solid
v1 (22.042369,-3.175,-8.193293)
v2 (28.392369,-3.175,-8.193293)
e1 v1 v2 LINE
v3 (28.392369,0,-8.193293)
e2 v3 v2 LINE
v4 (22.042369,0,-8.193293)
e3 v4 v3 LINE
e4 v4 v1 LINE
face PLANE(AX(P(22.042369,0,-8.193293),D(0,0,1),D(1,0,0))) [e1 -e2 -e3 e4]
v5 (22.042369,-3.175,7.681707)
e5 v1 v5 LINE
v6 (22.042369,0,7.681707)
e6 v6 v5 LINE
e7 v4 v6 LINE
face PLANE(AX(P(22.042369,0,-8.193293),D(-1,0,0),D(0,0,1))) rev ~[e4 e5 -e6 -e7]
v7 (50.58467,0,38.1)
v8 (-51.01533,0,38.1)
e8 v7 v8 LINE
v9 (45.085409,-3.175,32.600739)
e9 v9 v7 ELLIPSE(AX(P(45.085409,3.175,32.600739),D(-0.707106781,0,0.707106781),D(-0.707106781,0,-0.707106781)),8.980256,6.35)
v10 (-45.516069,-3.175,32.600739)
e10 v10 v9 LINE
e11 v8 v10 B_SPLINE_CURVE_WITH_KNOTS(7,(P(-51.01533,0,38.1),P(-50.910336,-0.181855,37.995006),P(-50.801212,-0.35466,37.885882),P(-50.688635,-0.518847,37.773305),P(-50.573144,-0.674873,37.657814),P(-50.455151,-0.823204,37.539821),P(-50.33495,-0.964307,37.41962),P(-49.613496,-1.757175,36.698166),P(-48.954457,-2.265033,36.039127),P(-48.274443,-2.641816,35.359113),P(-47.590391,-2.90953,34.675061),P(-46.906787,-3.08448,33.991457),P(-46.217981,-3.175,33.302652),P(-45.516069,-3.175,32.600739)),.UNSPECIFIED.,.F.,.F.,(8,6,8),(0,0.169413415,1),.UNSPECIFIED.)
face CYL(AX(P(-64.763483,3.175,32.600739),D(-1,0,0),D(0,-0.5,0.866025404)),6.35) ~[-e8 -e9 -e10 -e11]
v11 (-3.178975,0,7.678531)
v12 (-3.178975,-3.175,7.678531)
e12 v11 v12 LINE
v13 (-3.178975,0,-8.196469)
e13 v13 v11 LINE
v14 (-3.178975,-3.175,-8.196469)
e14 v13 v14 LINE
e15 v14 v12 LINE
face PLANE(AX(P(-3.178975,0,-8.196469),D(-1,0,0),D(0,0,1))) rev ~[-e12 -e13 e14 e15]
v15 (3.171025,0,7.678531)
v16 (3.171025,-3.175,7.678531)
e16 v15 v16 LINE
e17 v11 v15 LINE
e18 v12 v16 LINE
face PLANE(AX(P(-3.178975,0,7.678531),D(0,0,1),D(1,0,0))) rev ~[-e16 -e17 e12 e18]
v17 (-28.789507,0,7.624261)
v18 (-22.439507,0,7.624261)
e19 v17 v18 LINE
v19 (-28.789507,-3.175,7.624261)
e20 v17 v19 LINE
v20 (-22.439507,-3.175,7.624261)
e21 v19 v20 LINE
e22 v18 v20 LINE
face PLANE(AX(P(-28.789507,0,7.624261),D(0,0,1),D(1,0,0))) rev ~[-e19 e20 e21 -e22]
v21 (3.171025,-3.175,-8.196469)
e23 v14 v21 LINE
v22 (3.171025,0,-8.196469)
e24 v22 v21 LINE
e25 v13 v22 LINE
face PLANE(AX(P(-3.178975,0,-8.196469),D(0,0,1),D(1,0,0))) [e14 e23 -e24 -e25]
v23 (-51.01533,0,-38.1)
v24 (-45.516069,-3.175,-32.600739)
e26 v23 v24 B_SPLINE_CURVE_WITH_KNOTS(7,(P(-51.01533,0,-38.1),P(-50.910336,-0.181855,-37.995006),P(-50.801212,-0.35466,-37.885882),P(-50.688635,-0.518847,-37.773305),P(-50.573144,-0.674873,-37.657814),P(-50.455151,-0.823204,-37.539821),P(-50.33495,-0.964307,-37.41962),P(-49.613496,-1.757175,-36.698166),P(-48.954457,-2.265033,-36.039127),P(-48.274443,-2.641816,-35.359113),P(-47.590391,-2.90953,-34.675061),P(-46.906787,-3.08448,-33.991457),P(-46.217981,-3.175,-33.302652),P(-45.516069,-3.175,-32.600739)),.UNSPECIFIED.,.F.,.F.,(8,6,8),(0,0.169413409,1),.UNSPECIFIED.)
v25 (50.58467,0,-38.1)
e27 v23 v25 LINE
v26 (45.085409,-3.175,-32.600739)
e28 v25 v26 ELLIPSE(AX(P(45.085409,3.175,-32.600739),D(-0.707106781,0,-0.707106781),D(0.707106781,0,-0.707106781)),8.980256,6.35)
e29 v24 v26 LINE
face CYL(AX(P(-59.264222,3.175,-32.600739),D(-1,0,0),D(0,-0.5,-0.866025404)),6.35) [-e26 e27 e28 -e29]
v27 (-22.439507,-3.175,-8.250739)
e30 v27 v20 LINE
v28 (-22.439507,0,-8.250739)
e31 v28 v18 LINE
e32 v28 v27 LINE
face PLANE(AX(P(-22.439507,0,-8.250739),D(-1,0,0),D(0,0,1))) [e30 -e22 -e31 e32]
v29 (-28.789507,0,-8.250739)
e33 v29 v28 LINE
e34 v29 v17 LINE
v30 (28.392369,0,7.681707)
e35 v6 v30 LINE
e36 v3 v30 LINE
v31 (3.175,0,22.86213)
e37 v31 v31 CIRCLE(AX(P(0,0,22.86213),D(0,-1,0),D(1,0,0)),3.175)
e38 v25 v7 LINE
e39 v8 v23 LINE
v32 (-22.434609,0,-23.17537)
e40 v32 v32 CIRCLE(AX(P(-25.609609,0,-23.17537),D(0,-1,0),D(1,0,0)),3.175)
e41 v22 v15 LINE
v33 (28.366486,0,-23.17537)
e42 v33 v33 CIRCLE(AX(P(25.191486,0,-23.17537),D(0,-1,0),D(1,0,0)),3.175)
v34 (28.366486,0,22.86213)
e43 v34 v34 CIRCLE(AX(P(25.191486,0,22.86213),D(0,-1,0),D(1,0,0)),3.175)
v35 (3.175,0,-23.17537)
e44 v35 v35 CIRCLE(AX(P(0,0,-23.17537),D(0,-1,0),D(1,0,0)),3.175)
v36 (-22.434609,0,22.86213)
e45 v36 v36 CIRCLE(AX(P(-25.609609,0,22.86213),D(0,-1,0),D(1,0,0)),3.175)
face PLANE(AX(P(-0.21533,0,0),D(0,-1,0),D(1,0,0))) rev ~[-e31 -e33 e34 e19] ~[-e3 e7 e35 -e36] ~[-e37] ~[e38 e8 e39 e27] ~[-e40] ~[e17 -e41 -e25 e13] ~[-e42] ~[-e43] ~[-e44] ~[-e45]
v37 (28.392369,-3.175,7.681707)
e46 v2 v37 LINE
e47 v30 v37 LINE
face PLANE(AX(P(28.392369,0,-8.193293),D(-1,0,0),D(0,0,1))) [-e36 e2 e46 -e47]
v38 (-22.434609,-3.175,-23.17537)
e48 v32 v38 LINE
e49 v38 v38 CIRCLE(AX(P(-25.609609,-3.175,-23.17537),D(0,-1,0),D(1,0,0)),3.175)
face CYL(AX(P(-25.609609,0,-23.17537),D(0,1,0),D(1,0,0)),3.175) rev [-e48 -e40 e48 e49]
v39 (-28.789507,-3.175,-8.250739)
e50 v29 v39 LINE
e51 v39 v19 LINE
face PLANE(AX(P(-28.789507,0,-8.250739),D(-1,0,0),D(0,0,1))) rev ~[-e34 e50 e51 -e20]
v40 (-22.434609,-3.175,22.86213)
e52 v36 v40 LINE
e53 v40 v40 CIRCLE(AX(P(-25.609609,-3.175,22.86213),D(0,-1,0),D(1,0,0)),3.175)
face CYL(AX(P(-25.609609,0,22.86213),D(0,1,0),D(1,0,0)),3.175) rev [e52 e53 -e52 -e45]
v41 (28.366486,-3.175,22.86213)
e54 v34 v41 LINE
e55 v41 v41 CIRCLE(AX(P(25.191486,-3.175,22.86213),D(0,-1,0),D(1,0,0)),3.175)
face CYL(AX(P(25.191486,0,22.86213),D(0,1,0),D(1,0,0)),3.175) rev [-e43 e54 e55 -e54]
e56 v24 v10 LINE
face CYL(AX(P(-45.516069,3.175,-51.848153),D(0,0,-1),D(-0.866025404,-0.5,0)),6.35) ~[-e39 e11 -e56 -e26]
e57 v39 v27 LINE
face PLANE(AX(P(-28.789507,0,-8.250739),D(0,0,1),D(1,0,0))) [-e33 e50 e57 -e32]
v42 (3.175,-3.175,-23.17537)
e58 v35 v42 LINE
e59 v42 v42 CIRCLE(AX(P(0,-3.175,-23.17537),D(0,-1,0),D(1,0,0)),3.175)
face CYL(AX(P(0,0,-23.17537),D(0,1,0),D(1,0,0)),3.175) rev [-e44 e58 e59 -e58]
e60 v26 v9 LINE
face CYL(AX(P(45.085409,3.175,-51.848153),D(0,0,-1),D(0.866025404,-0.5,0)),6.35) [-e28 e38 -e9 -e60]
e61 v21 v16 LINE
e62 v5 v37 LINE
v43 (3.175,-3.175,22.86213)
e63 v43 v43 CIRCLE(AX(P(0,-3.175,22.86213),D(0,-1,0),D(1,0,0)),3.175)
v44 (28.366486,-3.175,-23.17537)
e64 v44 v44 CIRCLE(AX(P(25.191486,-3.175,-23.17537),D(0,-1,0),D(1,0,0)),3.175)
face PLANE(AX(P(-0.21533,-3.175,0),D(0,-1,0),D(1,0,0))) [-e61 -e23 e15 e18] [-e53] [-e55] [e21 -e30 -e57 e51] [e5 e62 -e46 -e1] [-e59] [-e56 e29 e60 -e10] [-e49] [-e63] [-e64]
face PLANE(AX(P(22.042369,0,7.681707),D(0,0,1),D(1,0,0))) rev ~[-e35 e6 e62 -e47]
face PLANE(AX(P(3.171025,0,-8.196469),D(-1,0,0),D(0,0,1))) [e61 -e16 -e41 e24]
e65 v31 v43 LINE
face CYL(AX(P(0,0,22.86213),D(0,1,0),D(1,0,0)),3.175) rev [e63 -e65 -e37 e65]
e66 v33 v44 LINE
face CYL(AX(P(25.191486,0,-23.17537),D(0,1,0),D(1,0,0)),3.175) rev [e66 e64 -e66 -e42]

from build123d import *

# Parameters (mm, degrees)
F0_R        = 3.175
F0_W        = 6.35
F0_H        = 15.875
F1_DEPTH    = 3.175
F2_T1_DEPTH = 129.0963065702
F3_T1_DEPTH = 98.1970452562
F4_T1_DEPTH = 98.1970452562
F5_T1_DEPTH = 118.0977839421


# Not quite as in the source:
# - a fillet or chamfer that OpenCascade refuses, or shapes differently, is made with other operations: its cross-section is extruded or revolved along the edge and cut away or added
# - a length typed as a fraction of an inch, garbled in the dataset ("3 / 203.2 mm" for 3/8 in), is restored


with BuildPart() as f1:
    # F0 (on Front) → F1 (new body)
    with BuildSketch(Plane.XZ):
        Polygon((-0.2153298438, 38.1), (-51.0153298438, 38.1), (-51.0153298438, 0), (-51.0153298438, -8.2507394254), (-51.0153298438, -38.1), (50.5846701562, -38.1), (50.5846701562, 7.6242605746), (50.5846701562, 38.1), align=None)
        with Locations((-25.6096087396, -23.1753697127)):
            Circle(F0_R, mode=Mode.SUBTRACT)
        with Locations((-25.6145072252, -0.3132394254)):
            Rectangle(F0_W, F0_H, mode=Mode.SUBTRACT)
        with Locations((0, -23.1753697127)):
            Circle(F0_R, mode=Mode.SUBTRACT)
        with Locations((25.1914858818, -23.1753697127)):
            Circle(F0_R, mode=Mode.SUBTRACT)
        with Locations((-0.0039746718, -0.2589693381)):
            Rectangle(F0_W, F0_H, mode=Mode.SUBTRACT)
        with Locations((25.21736947, -0.2557926551)):
            Rectangle(F0_W, F0_H, mode=Mode.SUBTRACT)
        with Locations((-25.6096087396, 22.8621302873)):
            Circle(F0_R, mode=Mode.SUBTRACT)
        with Locations((0, 22.8621302873)):
            Circle(F0_R, mode=Mode.SUBTRACT)
        with Locations((25.1914858818, 22.8621302873)):
            Circle(F0_R, mode=Mode.SUBTRACT)
    extrude(amount=F1_DEPTH)

    # F2: fillet of radius 6.35 on 1 edges, made by hand

    # F2_s2 → F2_t1 (cut)
    with BuildSketch(Plane.YZ.offset(-64.7634831288)):
        with BuildLine():
            ThreePointArc((0, 38.1), (-2.324261314, 35.775738686), (-3.175, 32.600738686))
            Line((-3.175, 32.600738686), (-3.175, 38.1))
            Line((-3.175, 38.1), (0, 38.1))
        make_face()
    extrude(amount=F2_T1_DEPTH, mode=Mode.SUBTRACT)

    # F3: fillet of radius 6.35 on 1 edges, made by hand

    # F3_s2 → F3_t1 (cut)
    with BuildSketch(Plane.XY.offset(-51.8481532851)):
        with BuildLine():
            ThreePointArc((-51.0153298438, 0), (-48.6910685297, -2.324261314), (-45.5160685297, -3.175))
            Line((-45.5160685297, -3.175), (-51.0153298438, -3.175))
            Line((-51.0153298438, -3.175), (-51.0153298438, 0))
        make_face()
    extrude(amount=F3_T1_DEPTH, mode=Mode.SUBTRACT)

    # F4: fillet of radius 6.35 on 1 edges, made by hand

    # F4_s2 → F4_t1 (cut)
    with BuildSketch(Plane.XY.offset(-51.8481532851)):
        with BuildLine():
            ThreePointArc((50.5846701562, 0), (48.2604088422, -2.324261314), (45.0854088422, -3.175))
            Line((45.0854088422, -3.175), (50.5846701562, -3.175))
            Line((50.5846701562, -3.175), (50.5846701562, 0))
        make_face()
    extrude(amount=F4_T1_DEPTH, mode=Mode.SUBTRACT)

    # F5: fillet of radius 6.35 on 1 edges, made by hand

    # F5_s2 → F5_t1 (cut)
    with BuildSketch(Plane.YZ.offset(-59.2642218148)):
        with BuildLine():
            ThreePointArc((0, -38.1), (-2.324261314, -35.775738686), (-3.175, -32.600738686))
            Line((-3.175, -32.600738686), (-3.175, -38.1))
            Line((-3.175, -38.1), (0, -38.1))
        make_face()
    extrude(amount=F5_T1_DEPTH, mode=Mode.SUBTRACT)


solid = f1.part
